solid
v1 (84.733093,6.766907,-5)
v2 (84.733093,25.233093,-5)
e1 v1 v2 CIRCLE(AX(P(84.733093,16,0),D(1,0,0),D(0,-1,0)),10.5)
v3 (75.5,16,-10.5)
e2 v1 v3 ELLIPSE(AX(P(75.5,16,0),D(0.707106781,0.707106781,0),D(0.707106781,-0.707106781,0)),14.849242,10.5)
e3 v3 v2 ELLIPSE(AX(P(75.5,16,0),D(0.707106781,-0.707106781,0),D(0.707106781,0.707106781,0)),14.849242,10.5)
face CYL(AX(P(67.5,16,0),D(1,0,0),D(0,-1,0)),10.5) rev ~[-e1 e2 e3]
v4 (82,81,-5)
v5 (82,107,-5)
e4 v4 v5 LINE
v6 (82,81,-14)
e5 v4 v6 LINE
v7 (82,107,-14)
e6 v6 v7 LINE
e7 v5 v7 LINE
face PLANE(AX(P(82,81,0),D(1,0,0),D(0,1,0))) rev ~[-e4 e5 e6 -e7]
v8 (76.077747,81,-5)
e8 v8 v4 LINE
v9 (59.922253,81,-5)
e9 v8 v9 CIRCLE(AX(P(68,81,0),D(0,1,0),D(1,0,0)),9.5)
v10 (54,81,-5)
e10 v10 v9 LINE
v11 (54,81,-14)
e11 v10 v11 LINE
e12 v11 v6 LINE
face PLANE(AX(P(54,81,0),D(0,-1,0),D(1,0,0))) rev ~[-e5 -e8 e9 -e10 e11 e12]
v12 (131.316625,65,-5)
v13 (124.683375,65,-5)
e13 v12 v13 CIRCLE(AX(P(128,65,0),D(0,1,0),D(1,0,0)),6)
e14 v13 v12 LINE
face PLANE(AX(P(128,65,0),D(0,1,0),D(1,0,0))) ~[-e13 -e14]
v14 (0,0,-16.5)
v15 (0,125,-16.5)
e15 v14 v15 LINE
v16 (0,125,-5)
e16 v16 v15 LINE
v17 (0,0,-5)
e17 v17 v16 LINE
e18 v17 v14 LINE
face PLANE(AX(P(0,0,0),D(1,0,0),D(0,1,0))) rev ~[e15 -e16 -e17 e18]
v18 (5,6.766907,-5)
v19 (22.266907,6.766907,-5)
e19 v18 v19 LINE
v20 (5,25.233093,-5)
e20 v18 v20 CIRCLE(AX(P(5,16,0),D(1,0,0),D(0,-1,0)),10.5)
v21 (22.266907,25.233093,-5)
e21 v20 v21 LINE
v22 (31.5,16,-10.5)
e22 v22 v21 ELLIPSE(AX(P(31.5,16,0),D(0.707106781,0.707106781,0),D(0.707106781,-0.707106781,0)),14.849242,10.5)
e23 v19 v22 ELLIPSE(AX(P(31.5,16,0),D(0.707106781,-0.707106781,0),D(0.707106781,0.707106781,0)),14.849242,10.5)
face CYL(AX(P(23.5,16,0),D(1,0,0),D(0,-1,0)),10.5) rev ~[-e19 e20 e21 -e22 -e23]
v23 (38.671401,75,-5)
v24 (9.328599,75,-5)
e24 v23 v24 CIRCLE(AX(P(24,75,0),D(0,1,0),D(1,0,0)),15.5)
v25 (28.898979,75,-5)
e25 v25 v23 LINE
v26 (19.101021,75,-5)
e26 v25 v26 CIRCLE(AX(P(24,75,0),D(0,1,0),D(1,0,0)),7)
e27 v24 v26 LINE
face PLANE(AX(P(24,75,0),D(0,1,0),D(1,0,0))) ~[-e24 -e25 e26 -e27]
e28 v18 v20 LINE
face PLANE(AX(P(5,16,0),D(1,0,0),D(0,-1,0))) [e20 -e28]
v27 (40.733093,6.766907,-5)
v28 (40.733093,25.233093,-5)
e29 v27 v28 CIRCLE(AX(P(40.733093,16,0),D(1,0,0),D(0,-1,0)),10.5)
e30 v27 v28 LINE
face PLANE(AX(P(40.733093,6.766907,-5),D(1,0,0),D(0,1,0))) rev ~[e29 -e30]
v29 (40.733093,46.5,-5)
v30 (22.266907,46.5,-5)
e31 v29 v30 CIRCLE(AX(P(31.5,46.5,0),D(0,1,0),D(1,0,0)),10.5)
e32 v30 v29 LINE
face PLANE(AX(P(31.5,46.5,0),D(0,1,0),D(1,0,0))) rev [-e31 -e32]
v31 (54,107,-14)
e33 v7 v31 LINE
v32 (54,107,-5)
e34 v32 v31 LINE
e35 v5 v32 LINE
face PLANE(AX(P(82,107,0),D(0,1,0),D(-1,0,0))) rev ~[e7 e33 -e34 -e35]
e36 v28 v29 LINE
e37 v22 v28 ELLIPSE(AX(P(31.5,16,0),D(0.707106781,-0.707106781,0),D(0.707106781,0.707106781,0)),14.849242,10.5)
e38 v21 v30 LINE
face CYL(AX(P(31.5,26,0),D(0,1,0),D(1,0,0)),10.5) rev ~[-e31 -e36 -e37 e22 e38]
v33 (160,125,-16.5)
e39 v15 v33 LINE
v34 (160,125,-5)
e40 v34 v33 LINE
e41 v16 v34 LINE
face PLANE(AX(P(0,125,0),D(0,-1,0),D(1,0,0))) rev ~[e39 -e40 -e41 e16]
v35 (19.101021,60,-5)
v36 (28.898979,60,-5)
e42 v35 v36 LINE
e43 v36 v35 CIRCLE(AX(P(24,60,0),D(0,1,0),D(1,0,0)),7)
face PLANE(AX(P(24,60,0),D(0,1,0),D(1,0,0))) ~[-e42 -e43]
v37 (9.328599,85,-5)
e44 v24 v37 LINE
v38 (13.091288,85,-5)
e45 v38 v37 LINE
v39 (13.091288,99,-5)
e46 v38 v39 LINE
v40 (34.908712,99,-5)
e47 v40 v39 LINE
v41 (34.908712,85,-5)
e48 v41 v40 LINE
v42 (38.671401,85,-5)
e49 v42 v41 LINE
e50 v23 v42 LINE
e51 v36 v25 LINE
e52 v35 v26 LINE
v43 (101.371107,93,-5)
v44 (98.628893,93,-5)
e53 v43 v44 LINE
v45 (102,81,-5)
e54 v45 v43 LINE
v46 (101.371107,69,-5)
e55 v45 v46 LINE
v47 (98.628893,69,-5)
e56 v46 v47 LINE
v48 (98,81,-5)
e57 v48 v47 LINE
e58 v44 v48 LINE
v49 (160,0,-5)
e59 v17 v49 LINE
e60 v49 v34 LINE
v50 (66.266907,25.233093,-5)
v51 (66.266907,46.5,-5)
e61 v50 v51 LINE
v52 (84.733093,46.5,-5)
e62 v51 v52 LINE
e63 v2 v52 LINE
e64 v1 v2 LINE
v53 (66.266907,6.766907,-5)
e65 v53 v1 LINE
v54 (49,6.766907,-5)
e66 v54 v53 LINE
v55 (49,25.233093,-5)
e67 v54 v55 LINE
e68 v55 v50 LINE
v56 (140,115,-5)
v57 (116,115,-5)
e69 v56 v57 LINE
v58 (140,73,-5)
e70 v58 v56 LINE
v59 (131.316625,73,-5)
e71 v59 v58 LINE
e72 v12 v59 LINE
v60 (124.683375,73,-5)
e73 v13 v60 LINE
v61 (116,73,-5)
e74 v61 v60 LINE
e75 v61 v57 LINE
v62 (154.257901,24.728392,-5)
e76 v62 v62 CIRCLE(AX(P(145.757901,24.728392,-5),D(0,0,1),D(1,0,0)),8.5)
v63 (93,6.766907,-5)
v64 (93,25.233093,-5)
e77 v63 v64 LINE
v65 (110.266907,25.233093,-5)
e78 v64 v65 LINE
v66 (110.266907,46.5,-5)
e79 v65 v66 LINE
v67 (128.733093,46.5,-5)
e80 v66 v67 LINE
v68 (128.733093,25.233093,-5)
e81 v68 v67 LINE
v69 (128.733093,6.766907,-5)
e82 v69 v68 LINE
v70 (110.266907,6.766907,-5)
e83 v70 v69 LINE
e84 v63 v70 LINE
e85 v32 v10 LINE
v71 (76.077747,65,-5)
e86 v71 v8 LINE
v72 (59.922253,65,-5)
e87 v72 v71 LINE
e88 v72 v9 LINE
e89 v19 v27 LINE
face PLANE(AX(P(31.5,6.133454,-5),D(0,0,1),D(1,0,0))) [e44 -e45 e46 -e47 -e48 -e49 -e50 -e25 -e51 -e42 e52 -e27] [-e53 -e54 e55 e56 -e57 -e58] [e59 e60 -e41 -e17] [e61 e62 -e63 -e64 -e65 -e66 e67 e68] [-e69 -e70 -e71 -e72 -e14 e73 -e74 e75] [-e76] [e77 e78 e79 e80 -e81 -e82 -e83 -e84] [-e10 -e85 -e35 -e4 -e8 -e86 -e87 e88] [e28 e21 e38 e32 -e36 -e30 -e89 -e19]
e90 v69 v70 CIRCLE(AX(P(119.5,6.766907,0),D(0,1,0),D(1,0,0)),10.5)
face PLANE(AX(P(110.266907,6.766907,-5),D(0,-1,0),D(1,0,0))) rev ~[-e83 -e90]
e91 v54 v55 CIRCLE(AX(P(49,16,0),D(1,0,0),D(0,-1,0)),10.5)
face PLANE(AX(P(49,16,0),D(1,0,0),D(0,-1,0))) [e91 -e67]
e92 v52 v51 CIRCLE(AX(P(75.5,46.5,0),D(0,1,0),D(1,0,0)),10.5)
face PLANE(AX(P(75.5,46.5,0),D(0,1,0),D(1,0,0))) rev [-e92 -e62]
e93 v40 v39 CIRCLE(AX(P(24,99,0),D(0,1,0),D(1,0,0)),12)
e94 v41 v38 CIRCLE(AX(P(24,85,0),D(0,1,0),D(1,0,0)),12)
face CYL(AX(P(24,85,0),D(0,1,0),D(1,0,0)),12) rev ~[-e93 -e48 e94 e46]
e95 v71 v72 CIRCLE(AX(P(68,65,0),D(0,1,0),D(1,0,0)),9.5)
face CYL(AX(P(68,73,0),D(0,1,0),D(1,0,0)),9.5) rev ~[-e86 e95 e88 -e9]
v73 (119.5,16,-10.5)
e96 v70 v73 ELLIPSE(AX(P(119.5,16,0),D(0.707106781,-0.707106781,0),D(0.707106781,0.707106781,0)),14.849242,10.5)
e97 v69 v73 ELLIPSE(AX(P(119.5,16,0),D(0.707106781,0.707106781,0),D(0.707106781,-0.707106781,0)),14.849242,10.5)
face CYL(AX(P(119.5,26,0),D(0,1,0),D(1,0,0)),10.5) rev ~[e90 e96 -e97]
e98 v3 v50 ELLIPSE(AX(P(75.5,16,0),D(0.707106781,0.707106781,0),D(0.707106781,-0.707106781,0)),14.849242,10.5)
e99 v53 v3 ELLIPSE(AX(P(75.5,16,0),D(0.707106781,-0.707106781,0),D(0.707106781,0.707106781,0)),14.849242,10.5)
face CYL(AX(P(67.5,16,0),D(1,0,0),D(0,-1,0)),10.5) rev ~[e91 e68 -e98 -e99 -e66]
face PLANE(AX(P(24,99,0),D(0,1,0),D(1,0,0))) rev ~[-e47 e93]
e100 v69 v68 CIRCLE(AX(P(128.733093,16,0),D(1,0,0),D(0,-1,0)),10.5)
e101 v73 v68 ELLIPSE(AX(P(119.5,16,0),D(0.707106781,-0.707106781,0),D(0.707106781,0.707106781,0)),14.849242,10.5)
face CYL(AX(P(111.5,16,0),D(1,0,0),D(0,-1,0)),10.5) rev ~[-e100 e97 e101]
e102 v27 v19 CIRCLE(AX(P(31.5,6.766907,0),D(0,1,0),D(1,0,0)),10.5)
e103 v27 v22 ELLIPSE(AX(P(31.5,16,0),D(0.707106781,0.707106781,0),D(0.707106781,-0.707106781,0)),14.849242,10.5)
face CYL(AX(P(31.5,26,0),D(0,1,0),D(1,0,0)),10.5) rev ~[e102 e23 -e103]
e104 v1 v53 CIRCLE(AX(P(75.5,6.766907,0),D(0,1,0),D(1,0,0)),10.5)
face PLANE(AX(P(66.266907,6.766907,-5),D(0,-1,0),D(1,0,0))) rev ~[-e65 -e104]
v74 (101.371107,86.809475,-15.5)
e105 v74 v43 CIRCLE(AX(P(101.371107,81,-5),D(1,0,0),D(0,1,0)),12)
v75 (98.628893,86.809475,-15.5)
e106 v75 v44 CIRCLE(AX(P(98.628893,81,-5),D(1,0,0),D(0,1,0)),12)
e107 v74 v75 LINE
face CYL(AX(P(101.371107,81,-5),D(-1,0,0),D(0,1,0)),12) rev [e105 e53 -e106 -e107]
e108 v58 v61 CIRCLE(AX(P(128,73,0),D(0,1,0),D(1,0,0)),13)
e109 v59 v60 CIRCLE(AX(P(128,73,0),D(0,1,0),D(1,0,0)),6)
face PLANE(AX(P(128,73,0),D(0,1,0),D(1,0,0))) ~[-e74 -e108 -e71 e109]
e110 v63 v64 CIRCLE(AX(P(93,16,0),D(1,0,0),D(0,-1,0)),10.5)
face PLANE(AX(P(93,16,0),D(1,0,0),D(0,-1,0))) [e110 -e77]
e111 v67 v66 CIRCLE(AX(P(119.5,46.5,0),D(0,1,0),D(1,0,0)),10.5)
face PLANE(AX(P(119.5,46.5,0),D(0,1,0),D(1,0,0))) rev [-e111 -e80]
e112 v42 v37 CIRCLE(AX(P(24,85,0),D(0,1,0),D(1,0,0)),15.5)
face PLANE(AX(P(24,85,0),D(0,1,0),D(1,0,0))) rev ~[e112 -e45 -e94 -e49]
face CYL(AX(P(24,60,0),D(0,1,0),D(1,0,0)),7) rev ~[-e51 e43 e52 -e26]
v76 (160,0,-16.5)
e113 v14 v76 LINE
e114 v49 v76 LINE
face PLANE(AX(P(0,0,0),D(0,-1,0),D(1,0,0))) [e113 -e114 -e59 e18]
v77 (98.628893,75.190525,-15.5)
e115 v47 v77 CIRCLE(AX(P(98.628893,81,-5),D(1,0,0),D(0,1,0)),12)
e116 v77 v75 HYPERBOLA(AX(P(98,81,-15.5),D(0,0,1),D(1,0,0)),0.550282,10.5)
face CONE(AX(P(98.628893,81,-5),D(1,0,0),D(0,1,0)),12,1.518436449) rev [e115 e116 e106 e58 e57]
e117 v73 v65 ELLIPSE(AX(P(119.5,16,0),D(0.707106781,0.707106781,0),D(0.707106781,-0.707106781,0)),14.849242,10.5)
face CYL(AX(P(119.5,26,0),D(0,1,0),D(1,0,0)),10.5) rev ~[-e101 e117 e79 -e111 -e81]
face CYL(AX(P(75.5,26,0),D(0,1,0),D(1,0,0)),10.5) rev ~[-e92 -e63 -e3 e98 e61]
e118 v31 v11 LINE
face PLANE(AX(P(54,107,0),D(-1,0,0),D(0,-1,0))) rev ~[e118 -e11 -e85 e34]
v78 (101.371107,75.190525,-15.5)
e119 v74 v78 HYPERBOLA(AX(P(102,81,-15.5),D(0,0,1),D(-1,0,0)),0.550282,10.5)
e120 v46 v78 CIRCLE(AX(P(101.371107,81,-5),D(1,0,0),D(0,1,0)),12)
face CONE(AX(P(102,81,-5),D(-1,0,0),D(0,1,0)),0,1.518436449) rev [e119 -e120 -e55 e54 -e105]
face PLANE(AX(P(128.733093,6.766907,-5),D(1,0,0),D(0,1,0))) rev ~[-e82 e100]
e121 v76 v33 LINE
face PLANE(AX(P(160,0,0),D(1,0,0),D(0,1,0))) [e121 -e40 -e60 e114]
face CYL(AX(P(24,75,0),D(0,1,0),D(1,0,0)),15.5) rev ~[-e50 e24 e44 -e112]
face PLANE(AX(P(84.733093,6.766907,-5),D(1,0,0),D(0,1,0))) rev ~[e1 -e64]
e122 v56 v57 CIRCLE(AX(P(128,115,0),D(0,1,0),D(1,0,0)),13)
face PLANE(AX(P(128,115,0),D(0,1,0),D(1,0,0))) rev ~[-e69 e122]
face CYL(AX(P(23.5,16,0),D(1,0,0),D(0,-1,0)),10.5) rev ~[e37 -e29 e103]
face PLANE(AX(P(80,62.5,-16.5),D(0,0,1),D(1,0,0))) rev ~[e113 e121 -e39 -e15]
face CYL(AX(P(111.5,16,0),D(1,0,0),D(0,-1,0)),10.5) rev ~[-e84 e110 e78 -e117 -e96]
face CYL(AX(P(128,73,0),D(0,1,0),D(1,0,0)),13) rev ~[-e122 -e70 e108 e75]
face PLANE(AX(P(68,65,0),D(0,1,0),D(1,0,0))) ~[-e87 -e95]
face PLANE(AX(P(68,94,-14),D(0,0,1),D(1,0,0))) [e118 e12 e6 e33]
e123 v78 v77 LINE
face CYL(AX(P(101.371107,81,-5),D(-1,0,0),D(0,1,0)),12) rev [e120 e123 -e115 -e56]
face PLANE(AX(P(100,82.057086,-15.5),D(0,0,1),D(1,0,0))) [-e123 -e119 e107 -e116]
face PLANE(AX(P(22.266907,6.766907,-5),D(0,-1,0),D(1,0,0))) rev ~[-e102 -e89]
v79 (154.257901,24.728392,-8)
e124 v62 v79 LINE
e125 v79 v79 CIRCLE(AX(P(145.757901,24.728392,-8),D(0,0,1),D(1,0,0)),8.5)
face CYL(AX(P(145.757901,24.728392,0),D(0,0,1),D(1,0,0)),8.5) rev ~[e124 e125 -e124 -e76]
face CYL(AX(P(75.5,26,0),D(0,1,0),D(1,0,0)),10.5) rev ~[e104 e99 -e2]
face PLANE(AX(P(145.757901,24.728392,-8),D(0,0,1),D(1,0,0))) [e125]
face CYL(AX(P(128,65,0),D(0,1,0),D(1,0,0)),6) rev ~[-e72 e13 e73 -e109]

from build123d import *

# Parameters (mm, degrees)
F0_W      = 160
F0_H      = 125
F1_DEPTH  = 16.5
F2_W      = 37
F2_H      = 10.5
F4_W      = 10.5
F4_H      = 41
F6_W      = 10.5
F6_H      = 41
F8_W      = 10.5
F8_H      = 41
F10_R     = 8.5
F11_DEPTH = 8
F14_W     = 9.5
F14_H     = 16
F17_DEPTH = 14
F20_W     = 160
F20_H     = 5
F21_DEPTH = 150
F24_W     = 18.4661853126
F24_H     = 1.2669073437
F24_W_2   = 1.2669073437
F24_H_2   = 18.4661853126
F25_DEPTH = 10
F27_START = -10.5
F27_DEPTH = 1


with BuildPart() as f1:
    # F0 (on Top) → F1 (new body)
    with BuildSketch(Plane.XY):
        with Locations((80, 62.5)):
            Rectangle(F0_W, F0_H)
    extrude(amount=-F1_DEPTH)

    # F2 (on face) → F3 (revolve, cut)
    with BuildSketch(Plane.XY):
        with Locations((23.5, 10.75)):
            Rectangle(F2_W, F2_H)
        with Locations((67.5, 10.75)):
            Rectangle(F2_W, F2_H)
        with Locations((111.5, 10.75)):
            Rectangle(F2_W, F2_H)
    revolve(axis=Axis((23.5, 16, 0), (1, 0, 0)), mode=Mode.SUBTRACT)

    # F4 (on face) → F5 (revolve, cut)
    with BuildSketch(Plane.XY):
        with Locations((36.75, 26)):
            Rectangle(F4_W, F4_H)
    revolve(axis=Axis((31.5, 26, 0), (0, 1, 0)), mode=Mode.SUBTRACT)

    # F6 (on face) → F7 (revolve, cut)
    with BuildSketch(Plane.XY):
        with Locations((80.75, 26)):
            Rectangle(F6_W, F6_H)
    revolve(axis=Axis((75.5, 26, 0), (0, 1, 0)), mode=Mode.SUBTRACT)

    # F8 (on face) → F9 (revolve, cut)
    with BuildSketch(Plane.XY):
        with Locations((124.75, 26)):
            Rectangle(F8_W, F8_H)
    revolve(axis=Axis((119.5, 26, 0), (0, 1, 0)), mode=Mode.SUBTRACT)

    # F10 (on face) → F11 (cut)
    with BuildSketch(Plane.XY):
        with Locations((145.7579010625, 24.7283919918)):
            Circle(F10_R)
    extrude(amount=-F11_DEPTH, mode=Mode.SUBTRACT)

    # F12 (on face) → F13 (revolve, cut)
    with BuildSketch(Plane.XY):
        Polygon((24, 75), (24, 60), (31, 60), (31, 75), (39.5, 75), (39.5, 85), (36, 85), (36, 99), (28.5, 99), (28.5, 113), (24, 113), (24, 99), (24, 85), align=None)
    revolve(axis=Axis((24, 92, 0), (0, 1, 0)), mode=Mode.SUBTRACT)

    # F14 (on face) → F15 (revolve, cut)
    with BuildSketch(Plane.XY):
        with Locations((72.75, 73)):
            Rectangle(F14_W, F14_H)
    revolve(axis=Axis((68, 73, 0), (0, 1, 0)), mode=Mode.SUBTRACT)

    # F16 (on face) → F17 (cut)
    with BuildSketch(Plane.XY):
        Polygon((54, 107), (54, 81), (58.5, 81), (77.5, 81), (82, 81), (82, 107), align=None)
    extrude(amount=-F17_DEPTH, mode=Mode.SUBTRACT)

    # F18 (on face) → F19 (revolve, cut)
    with BuildSketch(Plane.XY):
        Polygon((128, 73), (128, 65), (134, 65), (134, 73), (141, 73), (141, 115), (128, 115), align=None)
    revolve(axis=Axis((128, 94, 0), (0, 1, 0)), mode=Mode.SUBTRACT)

    # F20 (on Front) → F21 (cut)
    with BuildSketch(Plane.XZ):
        with Locations((80, -2.5)):
            Rectangle(F20_W, F20_H)
    extrude(amount=-F21_DEPTH, mode=Mode.SUBTRACT)

    # F22 (on face) → F23 (revolve, cut)
    with BuildSketch(Plane.XY.offset(-5)):
        Polygon((98.6288933514, 93), (98, 81), (102, 81), (101.3711066486, 93), align=None)
    revolve(axis=Axis((100, 81, -5), (1, 0, 0)), mode=Mode.SUBTRACT)

    # F24 (on face) → F25 (join)
    with BuildSketch(Plane.XY.offset(-5)):
        with Locations((31.5, 6.1334536718)):
            Rectangle(F24_W, F24_H)
        with Locations((41.3665463282, 16)):
            Rectangle(F24_W_2, F24_H_2)
        with Locations((85.3665463282, 16)):
            Rectangle(F24_W_2, F24_H_2)
        with Locations((75.5, 6.1334536718)):
            Rectangle(F24_W, F24_H)
        with Locations((129.3665463282, 16)):
            Rectangle(F24_W_2, F24_H_2)
        with Locations((119.5, 6.1334536718)):
            Rectangle(F24_W, F24_H)
    extrude(amount=-F25_DEPTH)

    # F26 (on face) → F27 (join)
    with BuildSketch(Plane.XY.offset(-5).offset(F27_START)):
        Polygon((101.528329799, 90.0000035763), (98.471670201, 90.0000035763), (98, 81), (98.3558213304, 74.210524559), (101.6441786696, 74.210524559), (102, 81), align=None)
    extrude(amount=-F27_DEPTH)


solid = f1.part
